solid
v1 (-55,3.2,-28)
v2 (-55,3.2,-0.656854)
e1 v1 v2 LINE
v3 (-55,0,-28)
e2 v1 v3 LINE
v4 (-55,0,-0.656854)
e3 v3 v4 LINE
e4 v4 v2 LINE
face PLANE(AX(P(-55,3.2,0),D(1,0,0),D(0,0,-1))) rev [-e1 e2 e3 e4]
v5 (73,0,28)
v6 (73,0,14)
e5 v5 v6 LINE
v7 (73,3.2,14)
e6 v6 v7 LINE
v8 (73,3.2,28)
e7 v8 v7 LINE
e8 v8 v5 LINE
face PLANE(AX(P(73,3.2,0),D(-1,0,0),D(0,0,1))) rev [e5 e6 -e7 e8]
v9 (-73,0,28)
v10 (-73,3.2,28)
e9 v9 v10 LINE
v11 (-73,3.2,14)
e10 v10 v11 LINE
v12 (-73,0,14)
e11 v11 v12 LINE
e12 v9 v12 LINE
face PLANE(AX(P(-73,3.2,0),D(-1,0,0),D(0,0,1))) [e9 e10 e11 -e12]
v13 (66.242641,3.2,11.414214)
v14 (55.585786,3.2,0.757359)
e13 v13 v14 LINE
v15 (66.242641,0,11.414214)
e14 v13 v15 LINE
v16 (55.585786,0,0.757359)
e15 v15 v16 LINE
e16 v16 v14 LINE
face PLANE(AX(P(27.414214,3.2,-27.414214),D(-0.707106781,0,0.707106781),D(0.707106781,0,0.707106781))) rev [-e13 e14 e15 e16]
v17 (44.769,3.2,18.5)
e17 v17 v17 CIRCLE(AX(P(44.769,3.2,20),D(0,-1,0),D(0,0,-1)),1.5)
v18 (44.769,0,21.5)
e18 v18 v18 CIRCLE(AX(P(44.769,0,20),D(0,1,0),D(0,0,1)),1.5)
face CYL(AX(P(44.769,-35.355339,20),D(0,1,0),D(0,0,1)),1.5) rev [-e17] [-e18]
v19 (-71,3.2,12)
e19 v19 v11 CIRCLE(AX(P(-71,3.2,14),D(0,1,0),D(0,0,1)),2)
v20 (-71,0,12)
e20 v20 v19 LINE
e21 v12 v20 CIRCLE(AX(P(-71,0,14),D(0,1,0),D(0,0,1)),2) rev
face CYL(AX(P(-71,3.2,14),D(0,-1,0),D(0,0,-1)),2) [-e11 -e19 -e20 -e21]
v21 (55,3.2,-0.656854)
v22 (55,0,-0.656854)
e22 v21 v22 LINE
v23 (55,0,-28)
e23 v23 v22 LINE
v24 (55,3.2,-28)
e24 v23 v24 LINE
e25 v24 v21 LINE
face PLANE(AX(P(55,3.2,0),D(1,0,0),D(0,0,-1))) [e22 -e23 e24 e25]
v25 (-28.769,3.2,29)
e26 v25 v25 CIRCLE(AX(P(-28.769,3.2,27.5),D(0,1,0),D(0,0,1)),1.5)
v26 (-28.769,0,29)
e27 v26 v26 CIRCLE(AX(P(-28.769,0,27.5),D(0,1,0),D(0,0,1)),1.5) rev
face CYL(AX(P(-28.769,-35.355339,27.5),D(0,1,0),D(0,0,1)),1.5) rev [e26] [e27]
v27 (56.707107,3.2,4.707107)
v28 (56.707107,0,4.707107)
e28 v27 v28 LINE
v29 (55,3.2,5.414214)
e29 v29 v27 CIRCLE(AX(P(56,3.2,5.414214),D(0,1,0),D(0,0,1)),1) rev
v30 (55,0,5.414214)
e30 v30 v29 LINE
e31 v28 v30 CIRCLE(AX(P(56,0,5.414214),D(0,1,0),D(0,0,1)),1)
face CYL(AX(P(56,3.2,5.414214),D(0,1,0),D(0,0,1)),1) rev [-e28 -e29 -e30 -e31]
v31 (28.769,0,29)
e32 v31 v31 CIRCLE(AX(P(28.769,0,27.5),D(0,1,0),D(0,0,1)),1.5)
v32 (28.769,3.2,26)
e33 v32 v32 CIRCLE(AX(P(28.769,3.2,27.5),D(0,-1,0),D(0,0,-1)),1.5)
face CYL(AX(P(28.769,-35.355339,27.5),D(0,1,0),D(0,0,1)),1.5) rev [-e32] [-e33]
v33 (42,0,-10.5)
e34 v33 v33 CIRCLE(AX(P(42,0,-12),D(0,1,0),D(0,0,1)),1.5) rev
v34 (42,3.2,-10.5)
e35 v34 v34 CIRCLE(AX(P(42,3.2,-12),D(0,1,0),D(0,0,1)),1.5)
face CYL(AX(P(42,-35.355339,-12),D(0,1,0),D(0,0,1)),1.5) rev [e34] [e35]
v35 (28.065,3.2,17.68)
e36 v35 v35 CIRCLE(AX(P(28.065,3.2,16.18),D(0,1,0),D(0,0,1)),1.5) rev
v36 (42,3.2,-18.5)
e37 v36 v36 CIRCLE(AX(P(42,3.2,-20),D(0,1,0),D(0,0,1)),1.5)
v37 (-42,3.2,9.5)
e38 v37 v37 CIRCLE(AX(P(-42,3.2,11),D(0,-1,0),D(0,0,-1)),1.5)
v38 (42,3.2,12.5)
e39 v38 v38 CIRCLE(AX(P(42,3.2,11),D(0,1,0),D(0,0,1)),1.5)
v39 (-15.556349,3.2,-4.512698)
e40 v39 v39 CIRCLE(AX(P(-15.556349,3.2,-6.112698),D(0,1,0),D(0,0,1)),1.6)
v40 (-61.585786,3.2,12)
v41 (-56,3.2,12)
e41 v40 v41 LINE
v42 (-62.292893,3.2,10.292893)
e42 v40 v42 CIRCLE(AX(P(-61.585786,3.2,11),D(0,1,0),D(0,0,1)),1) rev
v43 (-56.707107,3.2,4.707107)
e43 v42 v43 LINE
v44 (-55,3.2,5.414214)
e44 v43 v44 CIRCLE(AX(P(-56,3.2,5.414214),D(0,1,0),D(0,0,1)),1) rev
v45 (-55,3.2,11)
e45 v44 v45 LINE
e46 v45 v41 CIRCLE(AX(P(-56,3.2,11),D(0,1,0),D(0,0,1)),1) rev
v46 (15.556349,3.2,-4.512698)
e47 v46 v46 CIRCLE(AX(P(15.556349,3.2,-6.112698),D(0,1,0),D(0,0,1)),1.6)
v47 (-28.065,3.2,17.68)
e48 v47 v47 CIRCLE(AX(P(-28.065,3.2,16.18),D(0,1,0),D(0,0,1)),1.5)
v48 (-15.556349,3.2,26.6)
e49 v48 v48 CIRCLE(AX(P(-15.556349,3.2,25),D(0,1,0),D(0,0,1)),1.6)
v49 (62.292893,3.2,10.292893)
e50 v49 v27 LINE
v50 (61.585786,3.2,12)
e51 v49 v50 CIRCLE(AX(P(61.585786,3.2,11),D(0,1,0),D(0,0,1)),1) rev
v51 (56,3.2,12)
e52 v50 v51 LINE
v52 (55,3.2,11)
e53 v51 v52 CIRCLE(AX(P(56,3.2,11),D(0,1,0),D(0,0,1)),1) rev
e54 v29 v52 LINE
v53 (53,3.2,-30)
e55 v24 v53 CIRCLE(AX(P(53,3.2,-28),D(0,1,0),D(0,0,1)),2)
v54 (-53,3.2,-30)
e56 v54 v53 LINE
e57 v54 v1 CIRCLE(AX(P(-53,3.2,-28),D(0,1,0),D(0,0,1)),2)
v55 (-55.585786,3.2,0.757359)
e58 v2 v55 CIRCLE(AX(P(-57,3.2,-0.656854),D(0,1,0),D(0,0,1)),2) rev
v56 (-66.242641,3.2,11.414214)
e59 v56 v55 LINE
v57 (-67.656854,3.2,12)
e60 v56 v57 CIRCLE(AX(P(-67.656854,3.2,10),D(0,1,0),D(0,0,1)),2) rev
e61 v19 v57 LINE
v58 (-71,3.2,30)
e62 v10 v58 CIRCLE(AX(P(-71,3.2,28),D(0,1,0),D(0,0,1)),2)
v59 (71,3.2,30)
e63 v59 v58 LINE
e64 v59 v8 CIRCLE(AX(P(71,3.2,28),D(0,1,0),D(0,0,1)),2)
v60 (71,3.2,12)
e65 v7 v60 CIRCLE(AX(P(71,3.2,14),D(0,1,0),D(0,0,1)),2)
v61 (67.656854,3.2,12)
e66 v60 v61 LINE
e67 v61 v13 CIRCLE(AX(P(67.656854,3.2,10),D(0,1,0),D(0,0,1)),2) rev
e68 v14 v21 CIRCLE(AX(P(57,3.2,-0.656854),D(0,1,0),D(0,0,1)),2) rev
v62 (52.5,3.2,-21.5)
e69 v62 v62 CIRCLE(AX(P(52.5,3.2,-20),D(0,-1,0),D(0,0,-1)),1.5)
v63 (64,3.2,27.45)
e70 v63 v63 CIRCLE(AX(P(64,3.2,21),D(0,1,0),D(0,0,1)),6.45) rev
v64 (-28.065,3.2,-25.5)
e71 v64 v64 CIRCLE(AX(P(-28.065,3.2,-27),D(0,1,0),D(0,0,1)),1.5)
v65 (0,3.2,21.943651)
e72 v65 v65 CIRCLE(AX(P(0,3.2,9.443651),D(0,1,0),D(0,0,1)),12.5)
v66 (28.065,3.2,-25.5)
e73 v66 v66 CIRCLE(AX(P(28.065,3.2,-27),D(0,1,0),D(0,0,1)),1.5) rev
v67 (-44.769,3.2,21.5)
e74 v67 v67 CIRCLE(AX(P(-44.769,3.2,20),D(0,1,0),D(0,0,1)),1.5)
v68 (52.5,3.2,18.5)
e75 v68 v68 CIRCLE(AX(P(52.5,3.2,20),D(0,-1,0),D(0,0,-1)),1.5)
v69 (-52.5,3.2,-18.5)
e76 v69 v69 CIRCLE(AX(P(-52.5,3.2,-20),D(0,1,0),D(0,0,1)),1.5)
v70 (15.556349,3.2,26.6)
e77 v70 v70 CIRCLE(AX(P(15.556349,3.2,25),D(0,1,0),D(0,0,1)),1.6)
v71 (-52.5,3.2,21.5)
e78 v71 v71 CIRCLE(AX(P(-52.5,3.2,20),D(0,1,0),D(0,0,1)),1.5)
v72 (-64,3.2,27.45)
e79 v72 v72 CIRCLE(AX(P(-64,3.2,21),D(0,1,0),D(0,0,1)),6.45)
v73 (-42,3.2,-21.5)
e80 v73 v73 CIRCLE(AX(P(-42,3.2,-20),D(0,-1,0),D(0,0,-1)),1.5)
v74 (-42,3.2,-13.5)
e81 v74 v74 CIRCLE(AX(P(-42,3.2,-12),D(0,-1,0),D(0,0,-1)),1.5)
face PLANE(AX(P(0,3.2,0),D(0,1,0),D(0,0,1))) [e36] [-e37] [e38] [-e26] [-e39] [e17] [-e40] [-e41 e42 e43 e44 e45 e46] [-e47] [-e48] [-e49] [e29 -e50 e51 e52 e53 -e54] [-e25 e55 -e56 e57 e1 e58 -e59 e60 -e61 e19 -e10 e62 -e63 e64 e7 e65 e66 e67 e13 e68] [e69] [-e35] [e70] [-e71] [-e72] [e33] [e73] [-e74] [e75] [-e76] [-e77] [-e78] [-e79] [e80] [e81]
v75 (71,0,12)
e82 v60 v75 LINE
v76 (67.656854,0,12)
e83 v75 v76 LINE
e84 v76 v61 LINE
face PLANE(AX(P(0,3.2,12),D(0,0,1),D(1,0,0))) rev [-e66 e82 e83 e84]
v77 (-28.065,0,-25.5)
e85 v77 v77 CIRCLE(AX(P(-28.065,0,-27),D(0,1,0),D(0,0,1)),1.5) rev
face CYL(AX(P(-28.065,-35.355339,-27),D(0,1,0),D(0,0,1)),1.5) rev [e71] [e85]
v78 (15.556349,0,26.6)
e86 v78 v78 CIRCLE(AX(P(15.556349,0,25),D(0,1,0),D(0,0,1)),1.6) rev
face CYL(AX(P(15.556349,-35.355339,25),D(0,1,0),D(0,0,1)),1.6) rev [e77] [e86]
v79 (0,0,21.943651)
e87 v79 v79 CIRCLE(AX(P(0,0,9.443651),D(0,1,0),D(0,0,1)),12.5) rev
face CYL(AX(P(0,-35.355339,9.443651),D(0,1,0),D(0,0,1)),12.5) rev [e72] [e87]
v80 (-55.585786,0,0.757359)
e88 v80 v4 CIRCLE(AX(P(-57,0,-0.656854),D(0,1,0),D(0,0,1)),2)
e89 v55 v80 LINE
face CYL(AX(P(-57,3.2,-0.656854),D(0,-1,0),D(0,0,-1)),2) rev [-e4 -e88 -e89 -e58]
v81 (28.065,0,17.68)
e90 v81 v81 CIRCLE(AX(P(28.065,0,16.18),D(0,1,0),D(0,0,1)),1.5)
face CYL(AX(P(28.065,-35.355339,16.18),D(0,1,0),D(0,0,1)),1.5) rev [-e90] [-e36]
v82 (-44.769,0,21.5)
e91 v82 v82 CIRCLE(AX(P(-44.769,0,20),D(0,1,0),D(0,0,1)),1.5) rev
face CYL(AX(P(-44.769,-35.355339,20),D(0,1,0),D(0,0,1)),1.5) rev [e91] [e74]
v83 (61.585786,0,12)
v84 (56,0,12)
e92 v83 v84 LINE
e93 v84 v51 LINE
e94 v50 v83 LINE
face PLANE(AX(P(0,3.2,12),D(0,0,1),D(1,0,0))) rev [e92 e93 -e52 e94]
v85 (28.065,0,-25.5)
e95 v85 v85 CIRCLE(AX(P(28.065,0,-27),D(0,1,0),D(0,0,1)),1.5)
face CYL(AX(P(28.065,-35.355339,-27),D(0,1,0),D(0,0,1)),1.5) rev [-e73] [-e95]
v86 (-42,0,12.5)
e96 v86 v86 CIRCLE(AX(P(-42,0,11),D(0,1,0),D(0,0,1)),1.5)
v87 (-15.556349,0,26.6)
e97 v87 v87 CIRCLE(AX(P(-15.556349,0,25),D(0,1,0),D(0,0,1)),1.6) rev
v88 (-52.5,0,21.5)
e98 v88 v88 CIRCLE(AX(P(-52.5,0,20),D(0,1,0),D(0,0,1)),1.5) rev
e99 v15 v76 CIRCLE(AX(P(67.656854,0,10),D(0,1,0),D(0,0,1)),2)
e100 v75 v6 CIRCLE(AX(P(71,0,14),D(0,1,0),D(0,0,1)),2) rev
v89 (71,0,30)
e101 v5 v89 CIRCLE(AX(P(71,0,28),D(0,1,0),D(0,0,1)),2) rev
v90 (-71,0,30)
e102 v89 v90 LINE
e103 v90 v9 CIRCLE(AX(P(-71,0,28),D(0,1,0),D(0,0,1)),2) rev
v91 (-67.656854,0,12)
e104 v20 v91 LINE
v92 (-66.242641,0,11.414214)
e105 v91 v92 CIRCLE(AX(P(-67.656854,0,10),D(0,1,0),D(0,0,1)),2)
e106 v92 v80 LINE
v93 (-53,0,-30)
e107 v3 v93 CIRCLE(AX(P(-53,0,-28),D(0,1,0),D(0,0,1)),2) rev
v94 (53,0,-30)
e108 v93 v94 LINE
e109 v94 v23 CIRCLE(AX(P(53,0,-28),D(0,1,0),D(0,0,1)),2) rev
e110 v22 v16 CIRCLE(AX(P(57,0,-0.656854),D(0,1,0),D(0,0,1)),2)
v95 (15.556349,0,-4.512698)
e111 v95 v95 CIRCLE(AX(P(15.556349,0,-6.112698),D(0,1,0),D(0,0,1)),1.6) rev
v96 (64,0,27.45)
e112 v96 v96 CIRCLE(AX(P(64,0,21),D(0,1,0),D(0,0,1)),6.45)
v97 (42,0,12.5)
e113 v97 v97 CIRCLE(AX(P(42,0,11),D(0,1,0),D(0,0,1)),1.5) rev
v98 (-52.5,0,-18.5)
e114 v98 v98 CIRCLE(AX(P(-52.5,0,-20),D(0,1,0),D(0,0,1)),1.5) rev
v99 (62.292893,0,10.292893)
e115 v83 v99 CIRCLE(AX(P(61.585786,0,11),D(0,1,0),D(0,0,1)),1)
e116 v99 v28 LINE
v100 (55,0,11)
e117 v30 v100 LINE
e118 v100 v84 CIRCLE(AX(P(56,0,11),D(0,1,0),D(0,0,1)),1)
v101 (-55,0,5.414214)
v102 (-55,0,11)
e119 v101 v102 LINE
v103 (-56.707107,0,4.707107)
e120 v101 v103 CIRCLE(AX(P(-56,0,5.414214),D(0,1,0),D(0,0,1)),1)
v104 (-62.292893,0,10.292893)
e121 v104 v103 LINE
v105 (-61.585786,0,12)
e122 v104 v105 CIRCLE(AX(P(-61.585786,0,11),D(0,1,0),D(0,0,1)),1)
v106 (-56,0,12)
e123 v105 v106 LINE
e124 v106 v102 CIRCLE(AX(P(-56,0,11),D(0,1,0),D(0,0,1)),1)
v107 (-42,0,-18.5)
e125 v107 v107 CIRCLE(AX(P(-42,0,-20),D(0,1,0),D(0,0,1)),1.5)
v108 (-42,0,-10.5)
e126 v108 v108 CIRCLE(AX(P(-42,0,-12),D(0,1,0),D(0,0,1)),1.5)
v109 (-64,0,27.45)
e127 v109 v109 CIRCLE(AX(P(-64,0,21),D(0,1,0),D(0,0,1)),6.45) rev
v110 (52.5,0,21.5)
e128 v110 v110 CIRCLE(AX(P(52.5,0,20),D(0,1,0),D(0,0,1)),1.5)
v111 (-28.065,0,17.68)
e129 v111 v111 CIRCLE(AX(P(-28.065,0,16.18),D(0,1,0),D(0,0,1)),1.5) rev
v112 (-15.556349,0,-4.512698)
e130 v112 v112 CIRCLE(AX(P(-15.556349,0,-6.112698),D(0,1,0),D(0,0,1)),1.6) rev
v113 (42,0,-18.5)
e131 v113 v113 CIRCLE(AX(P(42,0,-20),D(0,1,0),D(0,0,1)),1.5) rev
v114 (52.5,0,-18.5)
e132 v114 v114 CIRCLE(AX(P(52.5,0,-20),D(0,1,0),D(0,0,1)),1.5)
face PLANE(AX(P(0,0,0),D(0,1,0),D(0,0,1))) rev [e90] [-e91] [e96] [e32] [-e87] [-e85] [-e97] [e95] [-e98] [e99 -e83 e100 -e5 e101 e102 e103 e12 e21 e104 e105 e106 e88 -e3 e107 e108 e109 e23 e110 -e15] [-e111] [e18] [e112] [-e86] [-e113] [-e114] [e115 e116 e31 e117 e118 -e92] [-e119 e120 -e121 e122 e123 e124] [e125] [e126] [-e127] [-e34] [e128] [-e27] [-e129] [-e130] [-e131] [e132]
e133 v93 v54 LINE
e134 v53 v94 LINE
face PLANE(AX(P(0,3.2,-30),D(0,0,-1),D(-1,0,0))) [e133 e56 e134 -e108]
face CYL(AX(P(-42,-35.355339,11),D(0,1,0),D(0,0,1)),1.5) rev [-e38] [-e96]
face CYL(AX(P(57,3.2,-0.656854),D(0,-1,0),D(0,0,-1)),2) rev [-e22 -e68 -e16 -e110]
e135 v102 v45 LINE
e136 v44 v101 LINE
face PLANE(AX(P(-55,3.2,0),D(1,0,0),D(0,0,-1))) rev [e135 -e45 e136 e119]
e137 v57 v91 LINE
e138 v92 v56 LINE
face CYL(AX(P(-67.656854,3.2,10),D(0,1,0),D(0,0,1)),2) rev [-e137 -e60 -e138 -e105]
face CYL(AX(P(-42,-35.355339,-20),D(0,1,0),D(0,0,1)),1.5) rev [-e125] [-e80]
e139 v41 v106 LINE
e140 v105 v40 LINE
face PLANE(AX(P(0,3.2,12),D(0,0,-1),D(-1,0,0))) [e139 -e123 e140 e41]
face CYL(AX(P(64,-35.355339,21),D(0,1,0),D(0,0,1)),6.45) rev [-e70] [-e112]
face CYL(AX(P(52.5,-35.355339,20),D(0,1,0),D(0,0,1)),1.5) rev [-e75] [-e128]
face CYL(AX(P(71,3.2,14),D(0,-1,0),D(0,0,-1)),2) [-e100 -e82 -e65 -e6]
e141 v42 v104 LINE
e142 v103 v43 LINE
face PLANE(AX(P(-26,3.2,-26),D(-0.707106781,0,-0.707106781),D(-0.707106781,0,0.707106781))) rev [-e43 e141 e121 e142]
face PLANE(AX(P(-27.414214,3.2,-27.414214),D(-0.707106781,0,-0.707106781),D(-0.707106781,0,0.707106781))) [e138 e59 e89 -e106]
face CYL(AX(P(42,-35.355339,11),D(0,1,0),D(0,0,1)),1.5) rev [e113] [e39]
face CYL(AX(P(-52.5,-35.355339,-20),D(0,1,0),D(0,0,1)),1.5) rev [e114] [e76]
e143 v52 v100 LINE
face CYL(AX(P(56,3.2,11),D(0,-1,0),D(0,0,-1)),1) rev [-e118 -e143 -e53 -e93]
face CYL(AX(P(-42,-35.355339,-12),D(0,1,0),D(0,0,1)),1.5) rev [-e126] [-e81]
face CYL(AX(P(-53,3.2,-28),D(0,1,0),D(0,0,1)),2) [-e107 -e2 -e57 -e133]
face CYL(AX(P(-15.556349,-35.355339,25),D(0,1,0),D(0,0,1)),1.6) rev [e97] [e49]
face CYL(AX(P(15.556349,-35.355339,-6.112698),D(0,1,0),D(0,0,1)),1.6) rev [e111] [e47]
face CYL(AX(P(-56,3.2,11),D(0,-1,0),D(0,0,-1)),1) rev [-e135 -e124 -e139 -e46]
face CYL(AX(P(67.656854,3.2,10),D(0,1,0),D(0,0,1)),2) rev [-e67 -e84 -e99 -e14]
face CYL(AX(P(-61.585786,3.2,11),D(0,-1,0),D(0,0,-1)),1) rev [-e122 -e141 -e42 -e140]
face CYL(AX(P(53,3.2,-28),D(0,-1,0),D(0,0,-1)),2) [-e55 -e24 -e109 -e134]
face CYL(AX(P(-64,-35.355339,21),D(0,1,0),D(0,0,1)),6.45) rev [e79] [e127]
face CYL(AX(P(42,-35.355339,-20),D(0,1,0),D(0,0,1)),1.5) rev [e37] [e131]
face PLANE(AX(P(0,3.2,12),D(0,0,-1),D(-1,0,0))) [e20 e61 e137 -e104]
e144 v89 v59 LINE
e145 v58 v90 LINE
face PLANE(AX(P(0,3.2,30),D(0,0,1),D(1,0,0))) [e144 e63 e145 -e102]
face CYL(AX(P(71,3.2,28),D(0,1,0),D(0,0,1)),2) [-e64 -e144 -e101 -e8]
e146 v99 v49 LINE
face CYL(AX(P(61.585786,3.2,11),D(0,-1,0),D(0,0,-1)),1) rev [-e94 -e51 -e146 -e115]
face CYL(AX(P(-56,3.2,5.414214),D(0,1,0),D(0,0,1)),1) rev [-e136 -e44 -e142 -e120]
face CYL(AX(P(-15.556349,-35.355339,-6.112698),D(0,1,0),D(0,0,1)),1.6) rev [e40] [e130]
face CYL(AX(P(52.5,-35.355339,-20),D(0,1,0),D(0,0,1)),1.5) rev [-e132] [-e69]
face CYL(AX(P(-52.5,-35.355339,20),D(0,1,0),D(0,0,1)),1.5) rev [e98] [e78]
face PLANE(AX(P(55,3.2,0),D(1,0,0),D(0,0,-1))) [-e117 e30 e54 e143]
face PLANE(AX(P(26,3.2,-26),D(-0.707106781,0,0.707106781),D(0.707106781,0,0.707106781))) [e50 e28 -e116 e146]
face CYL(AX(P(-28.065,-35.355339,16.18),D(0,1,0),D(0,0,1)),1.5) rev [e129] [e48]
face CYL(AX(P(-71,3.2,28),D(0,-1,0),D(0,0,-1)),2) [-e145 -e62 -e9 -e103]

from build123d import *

# Parameters (mm, degrees)
EXTRUDE_1_DEPTH     = 3.2
SKETCH_2_R          = 12.5
SKETCH_2_R_2        = 1.6
SKETCH_2_R_3        = 1.5
SKETCH_2_R_4        = 6.45
CUT_EXTRUDE_1_DEPTH = 3.2
FILLET_1_R          = 2
FILLET_2_R          = 1


# Read off the part's stored shape, not the designer's step: 凸台-拉伸1
with BuildPart() as part:
    # 凸台-拉伸1 outline → 凸台-拉伸1 (new body)
    with BuildSketch(Plane(origin=(0, 0, 0), x_dir=(1, 0, 0), z_dir=(0, 1, 0))):
        Polygon((-55, -0.171572875), (-66.828427125, -12), (-73, -12), (-73, -30), (73, -30), (73, -12), (66.828427125, -12), (55, -0.171572875), (55, 30), (-55, 30), align=None)
        Polygon((-64, -12), (-55, -3), (-55, -12), align=None, mode=Mode.SUBTRACT)
        Polygon((55, -12), (55, -3), (64, -12), align=None, mode=Mode.SUBTRACT)
    extrude(amount=EXTRUDE_1_DEPTH)

    # 草图2 → 切除-拉伸1 (cut)
    with BuildSketch(Plane(origin=(0, 3.2, 0), x_dir=(1, 0, 0), z_dir=(0, 1, 0))):
        with Locations(Location((0, -9.443650814, 0), (0, 0, 270))):
            Circle(SKETCH_2_R)
        with Locations(Location((15.556349186, -25, 0), (0, 0, 270))):
            Circle(SKETCH_2_R_2)
        with Locations(Location((15.556349186, 6.112698372, 0), (0, 0, 270))):
            Circle(SKETCH_2_R_2)
        with Locations(Location((-15.556349186, 6.112698372, 0), (0, 0, 270))):
            Circle(SKETCH_2_R_2)
        with Locations(Location((-15.556349186, -25, 0), (0, 0, 270))):
            Circle(SKETCH_2_R_2)
        with Locations(Location((-52.5, 20, 0), (0, 0, 270))):
            Circle(SKETCH_2_R_3)
        with Locations(Location((-52.5, -20, 0), (0, 0, 270))):
            Circle(SKETCH_2_R_3)
        with Locations(Location((52.5, -20, 0), (0, 0, 270))):
            Circle(SKETCH_2_R_3)
        with Locations(Location((52.5, 20, 0), (0, 0, 270))):
            Circle(SKETCH_2_R_3)
        with Locations(Location((-64, -21, 0), (0, 0, 270))):
            Circle(SKETCH_2_R_4)
        with Locations(Location((64, -21, 0), (0, 0, 270))):
            Circle(SKETCH_2_R_4)
        with Locations(Location((42, 20, 0), (0, 0, 270))):
            Circle(SKETCH_2_R_3)
        with Locations(Location((42, 12, 0), (0, 0, 270))):
            Circle(SKETCH_2_R_3)
        with Locations(Location((-42, 12, 0), (0, 0, 270))):
            Circle(SKETCH_2_R_3)
        with Locations(Location((-42, 20, 0), (0, 0, 270))):
            Circle(SKETCH_2_R_3)
        with Locations(Location((42, -11, 0), (0, 0, 270))):
            Circle(SKETCH_2_R_3)
        with Locations(Location((-42, -11, 0), (0, 0, 270))):
            Circle(SKETCH_2_R_3)
        with Locations(Location((-28.065, 27, 0), (0, 0, 270))):
            Circle(SKETCH_2_R_3)
        with Locations(Location((28.065, 27, 0), (0, 0, 270))):
            Circle(SKETCH_2_R_3)
        with Locations(Location((-28.065, -16.18, 0), (0, 0, 270))):
            Circle(SKETCH_2_R_3)
        with Locations(Location((28.065, -16.18, 0), (0, 0, 270))):
            Circle(SKETCH_2_R_3)
        with Locations(Location((-28.769, -27.5, 0), (0, 0, 270))):
            Circle(SKETCH_2_R_3)
        with Locations(Location((28.769, -27.5, 0), (0, 0, 270))):
            Circle(SKETCH_2_R_3)
        with Locations(Location((-44.769, -20, 0), (0, 0, 270))):
            Circle(SKETCH_2_R_3)
        with Locations(Location((44.769, -20, 0), (0, 0, 270))):
            Circle(SKETCH_2_R_3)
    extrude(amount=-CUT_EXTRUDE_1_DEPTH, mode=Mode.SUBTRACT)

    # 圆角1
    fillet_1_edges = [part.edges().sort_by_distance(p)[0] for p in [
        (-66.828427125, 1.6, 12),
        (-55, 1.6, 0.171572875),
        (-55, 1.6, -30),
        (55, 1.6, -30),
        (55, 1.6, 0.171572875),
        (66.828427125, 1.6, 12),
        (73, 1.6, 12),
        (73, 1.6, 30),
        (-73, 1.6, 30),
        (-73, 1.6, 12),
    ]]
    fillet(fillet_1_edges, radius=FILLET_1_R)

    # 圆角2
    fillet_2_edges = [part.edges().sort_by_distance(p)[0] for p in [
        (-64, 1.6, 12),
        (-55, 1.6, 12),
        (-55, 1.6, 3),
        (55, 1.6, 3),
        (55, 1.6, 12),
        (64, 1.6, 12),
    ]]
    fillet(fillet_2_edges, radius=FILLET_2_R)


solid = part.part
